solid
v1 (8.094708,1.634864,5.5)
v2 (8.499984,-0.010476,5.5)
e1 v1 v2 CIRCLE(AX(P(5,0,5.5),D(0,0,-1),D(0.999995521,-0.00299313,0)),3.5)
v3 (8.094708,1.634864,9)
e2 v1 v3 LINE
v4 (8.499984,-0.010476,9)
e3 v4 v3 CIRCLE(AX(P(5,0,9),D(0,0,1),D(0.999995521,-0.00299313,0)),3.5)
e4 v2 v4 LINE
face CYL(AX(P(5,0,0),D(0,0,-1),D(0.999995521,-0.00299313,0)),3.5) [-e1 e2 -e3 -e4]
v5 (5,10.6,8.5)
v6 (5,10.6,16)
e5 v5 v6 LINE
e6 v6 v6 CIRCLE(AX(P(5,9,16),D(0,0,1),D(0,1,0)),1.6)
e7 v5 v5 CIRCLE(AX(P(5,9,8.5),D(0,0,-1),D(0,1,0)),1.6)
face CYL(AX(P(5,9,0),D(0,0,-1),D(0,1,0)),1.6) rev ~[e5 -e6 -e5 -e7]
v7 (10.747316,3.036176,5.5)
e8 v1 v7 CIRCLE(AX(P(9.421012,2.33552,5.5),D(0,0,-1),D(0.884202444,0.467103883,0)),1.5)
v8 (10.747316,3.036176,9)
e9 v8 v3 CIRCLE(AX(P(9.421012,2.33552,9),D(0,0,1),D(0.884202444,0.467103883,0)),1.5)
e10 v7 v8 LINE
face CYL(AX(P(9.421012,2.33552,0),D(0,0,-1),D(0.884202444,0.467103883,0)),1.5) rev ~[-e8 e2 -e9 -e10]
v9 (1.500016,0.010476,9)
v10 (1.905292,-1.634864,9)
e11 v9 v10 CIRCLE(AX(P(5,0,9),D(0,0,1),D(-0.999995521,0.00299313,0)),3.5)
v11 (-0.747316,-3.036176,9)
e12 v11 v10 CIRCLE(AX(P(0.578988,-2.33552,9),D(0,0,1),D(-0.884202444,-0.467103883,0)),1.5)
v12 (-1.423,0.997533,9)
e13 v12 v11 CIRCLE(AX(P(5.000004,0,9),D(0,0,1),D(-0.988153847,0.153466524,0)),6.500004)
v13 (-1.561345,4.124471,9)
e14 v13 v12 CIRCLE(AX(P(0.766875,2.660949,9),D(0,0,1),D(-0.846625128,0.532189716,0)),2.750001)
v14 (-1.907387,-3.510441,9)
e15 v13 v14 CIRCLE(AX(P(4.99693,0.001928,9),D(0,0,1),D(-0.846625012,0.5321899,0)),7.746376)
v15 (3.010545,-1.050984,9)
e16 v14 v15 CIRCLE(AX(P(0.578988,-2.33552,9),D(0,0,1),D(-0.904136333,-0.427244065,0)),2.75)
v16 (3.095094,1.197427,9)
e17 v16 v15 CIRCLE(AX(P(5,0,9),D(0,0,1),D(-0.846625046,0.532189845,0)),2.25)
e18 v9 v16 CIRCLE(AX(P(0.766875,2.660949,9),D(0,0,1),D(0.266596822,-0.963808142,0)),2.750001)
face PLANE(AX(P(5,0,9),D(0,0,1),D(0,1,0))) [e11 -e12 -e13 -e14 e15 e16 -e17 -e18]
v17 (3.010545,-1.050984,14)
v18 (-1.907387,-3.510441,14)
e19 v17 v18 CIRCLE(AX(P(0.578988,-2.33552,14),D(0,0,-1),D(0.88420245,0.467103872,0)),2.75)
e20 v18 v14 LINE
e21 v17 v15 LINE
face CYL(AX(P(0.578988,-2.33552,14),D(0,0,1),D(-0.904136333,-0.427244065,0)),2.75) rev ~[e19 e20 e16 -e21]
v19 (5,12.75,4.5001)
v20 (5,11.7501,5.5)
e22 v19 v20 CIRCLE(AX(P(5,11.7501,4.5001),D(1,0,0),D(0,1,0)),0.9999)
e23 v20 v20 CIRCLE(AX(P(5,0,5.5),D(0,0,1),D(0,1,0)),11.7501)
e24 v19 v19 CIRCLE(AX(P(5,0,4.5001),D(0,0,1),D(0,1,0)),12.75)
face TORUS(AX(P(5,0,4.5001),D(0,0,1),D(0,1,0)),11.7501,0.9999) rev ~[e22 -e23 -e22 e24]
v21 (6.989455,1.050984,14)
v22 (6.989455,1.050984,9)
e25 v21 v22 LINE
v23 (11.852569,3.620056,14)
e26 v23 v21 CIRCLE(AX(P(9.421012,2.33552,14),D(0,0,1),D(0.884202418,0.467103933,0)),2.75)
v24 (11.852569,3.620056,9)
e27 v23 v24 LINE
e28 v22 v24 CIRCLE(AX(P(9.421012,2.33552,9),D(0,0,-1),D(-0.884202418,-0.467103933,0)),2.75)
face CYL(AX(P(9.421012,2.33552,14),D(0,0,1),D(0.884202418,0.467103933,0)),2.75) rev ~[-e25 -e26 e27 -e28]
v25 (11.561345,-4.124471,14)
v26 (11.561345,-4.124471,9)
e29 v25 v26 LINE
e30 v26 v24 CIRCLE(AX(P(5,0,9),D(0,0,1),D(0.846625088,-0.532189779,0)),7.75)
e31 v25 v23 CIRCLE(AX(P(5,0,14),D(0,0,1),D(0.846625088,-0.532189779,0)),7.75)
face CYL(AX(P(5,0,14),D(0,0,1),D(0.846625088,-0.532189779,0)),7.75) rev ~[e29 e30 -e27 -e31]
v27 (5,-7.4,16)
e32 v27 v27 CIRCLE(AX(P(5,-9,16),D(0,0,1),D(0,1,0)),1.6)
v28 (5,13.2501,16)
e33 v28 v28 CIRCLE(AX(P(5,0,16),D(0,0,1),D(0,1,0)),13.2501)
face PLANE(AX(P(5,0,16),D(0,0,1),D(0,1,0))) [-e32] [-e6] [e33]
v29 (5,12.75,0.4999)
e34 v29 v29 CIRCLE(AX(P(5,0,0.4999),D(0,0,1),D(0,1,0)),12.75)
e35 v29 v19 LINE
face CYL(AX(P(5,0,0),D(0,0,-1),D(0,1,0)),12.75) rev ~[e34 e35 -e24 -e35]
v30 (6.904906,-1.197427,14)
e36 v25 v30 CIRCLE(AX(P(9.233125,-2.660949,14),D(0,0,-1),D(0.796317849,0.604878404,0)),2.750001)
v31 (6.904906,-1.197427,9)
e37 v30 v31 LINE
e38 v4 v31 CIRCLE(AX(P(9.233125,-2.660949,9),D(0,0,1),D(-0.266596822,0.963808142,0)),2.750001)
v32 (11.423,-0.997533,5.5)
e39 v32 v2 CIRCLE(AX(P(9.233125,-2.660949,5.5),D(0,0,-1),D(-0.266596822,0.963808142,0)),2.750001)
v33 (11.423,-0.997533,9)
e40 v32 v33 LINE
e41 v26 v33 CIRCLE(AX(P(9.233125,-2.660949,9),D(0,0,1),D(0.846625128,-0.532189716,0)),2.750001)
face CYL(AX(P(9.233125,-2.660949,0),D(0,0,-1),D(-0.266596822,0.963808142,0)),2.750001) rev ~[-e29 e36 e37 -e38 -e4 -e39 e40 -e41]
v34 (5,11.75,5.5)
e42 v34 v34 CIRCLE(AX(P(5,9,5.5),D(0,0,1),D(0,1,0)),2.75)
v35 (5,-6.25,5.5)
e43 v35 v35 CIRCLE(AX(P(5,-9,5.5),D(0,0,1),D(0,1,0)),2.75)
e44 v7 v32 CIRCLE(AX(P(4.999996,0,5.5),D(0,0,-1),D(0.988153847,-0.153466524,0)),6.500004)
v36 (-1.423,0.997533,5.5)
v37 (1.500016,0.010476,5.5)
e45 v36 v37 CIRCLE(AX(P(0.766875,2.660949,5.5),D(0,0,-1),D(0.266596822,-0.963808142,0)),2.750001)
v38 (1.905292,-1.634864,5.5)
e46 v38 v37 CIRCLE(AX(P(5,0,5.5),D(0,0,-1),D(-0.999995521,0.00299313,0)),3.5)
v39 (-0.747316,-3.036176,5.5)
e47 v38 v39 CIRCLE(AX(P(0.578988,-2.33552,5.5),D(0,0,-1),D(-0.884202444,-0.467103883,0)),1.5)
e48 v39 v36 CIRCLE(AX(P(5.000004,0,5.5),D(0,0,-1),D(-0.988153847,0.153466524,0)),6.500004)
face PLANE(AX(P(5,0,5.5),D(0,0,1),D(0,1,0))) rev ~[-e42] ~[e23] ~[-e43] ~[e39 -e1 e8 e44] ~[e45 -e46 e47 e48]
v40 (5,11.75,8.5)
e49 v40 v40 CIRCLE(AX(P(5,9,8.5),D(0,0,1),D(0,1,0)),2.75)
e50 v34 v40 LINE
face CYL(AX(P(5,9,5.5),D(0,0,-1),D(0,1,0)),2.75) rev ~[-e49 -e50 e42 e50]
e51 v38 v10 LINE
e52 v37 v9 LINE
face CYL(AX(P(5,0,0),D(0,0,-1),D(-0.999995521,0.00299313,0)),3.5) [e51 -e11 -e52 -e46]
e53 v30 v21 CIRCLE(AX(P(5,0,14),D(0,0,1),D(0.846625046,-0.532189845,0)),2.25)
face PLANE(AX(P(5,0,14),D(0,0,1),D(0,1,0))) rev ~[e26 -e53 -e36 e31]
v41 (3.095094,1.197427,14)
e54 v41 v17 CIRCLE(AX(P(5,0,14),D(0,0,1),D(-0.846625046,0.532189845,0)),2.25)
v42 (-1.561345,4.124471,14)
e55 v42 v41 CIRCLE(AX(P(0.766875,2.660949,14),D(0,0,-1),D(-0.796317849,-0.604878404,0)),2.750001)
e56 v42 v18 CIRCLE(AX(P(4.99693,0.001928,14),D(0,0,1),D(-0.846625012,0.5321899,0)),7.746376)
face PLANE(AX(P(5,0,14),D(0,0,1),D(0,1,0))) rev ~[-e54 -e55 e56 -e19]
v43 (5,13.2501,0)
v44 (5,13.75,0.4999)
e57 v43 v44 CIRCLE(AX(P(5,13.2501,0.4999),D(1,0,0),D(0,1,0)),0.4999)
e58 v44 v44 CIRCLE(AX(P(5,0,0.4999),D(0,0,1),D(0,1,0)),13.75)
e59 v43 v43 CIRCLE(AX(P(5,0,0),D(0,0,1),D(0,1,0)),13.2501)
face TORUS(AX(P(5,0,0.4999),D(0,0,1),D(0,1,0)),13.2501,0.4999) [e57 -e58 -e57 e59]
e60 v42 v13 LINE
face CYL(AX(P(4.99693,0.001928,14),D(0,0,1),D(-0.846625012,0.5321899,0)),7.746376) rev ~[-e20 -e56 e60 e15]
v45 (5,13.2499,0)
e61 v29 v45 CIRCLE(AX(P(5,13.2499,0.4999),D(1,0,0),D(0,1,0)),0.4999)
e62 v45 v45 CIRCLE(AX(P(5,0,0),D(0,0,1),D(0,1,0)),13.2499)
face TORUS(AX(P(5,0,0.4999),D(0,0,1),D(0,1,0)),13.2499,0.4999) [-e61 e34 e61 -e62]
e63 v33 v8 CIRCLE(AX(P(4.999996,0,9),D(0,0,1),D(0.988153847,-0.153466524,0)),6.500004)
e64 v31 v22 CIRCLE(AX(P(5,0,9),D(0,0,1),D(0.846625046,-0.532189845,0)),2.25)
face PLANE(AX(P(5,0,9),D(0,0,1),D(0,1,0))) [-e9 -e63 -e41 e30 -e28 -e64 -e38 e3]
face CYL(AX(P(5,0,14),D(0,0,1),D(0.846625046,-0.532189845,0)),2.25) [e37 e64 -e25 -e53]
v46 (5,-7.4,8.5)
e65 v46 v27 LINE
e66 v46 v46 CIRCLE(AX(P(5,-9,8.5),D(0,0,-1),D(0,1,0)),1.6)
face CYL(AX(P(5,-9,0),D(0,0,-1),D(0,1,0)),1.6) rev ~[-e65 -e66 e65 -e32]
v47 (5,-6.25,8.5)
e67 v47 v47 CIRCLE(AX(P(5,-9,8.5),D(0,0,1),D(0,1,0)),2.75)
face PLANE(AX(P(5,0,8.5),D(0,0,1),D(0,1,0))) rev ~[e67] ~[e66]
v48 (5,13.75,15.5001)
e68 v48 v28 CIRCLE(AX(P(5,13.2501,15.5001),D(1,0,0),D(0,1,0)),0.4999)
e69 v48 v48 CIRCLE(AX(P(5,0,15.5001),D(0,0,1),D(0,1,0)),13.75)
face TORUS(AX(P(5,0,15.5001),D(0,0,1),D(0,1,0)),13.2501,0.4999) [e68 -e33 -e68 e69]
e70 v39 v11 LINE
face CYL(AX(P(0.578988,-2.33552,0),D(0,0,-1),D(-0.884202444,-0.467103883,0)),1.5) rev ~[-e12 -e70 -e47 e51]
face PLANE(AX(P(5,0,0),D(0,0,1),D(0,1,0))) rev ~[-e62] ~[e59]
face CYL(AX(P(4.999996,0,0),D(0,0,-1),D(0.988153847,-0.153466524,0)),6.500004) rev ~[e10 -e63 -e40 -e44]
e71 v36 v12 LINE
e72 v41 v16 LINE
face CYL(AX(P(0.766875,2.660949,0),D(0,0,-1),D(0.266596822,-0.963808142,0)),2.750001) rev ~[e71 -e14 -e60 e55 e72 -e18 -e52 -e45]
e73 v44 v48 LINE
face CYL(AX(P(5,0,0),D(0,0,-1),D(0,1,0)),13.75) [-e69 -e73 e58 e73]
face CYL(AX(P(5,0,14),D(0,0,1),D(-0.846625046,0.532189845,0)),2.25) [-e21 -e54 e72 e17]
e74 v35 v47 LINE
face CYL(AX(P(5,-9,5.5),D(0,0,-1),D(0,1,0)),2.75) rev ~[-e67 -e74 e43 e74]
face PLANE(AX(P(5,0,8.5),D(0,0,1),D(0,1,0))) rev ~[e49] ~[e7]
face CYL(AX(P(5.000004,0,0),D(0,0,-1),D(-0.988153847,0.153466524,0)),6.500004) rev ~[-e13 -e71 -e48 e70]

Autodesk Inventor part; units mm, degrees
ref_plane "YZ Plane" through (0, 0, 0) normal (1, 0, 0) x (0, 1, 0)
ref_plane "XZ Plane" through (0, 0, 0) normal (0, 1, 0) x (-1, 0, 0)
ref_plane "XY Plane" through (0, 0, 0) normal (0, 0, 1) x (1, 0, 0)
sketch "Skizze2" plane through (5, 0, 0) normal (0, 0, 1) x (0, 1, 0)
  line L0 (8.038058, 0) -> (-10.166505, 0) construction
  line L1 (0, 30.8) -> (0, -30.8) construction
  line L2 (-70, 0) -> (70, 0) construction
  arc A0 (3.036176, -5.747316) -> (1.634864, -3.094708) centre (2.33552, -4.421012) ccw
  arc A1 (-3.036176, 5.747316) -> (-1.634864, 3.094708) centre (-2.33552, 4.421012) ccw
  line L3 (-0.006109, 0) -> (9.613184, 0) construction
  line L4 (-0.006109, 0) -> (-9.625402, 0) construction
  circle A2 centre (0, 0) radius 5 construction
  line L5 (-2.33552, 4.421012) -> (2.33552, -4.421012) construction
  line L6 (-6.186265, -9.841316) -> (6.420655, 10.214191) construction
  arc A3 (-0.010476, -3.499984) -> (-0.997533, -6.423) centre (-2.660949, -4.233126) ccw
  arc A4 (0.010476, 3.499984) -> (0.997533, 6.423) centre (2.660949, 4.233126) ccw
  arc A5 (-10.500103, 0) -> (-10.500103, 0) centre (0, 0) ccw
  arc A6 (10.499894, 0) -> (10.499894, 0) centre (0, 0) ccw
  arc A7 (-7.500104, 0) -> (-7.500104, 0) centre (0, 0) ccw
  arc A8 (7.499894, 0) -> (7.499894, 0) centre (0, 0) ccw
  arc A9 (-0.010476, -3.499984) -> (1.634864, -3.094708) centre (0, 0) ccw
  arc A10 (-0.997533, -6.423) -> (3.036176, -5.747316) centre (0, 0) ccw
  arc A11 (0.010476, 3.499984) -> (-1.634864, 3.094708) centre (0, 0) ccw
  arc A12 (0.997533, 6.423) -> (-3.036176, 5.747316) centre (0, 0) ccw
  circle A13 centre (0, 0) radius 13.75
  circle A14 centre (0, 0) radius 12.75
  circle A15 centre (0, 0) radius 9 construction
  circle A16 centre (-9, 0) radius 1.6
  circle A17 centre (9, 0) radius 1.6
  arc A18 (-4.124471, -6.561345) -> (3.620056, -6.852569) centre (0, 0) ccw
  arc A19 (-3.510441, 6.907387) -> (-1.050984, 1.989455) centre (-2.33552, 4.421012) ccw
  arc A20 (3.620056, -6.852569) -> (1.050984, -1.989455) centre (2.33552, -4.421012) ccw
  arc A21 (-1.197427, -1.904906) -> (1.050984, -1.989455) centre (0, 0) ccw
  arc A22 (1.197427, 1.904906) -> (-1.050984, 1.989455) centre (0, 0) ccw
  arc A23 (4.124471, 6.561345) -> (-3.510441, 6.907387) centre (0.001927, 0.003066) ccw
  circle A24 centre (-9, 0) radius 2.75
  circle A25 centre (9, 0) radius 2.75
  dimension "d3" = 3
  dimension "d4" = 3
  dimension "d57" = 10
  dimension "d67" = 152.154
  dimension "d215" = 5.5
  dimension "d216" = 60
  dimension "d218" = 27.5
  dimension "d219" = 1
  dimension "d227" = 18
  dimension "d228" = 3.2
  dimension "d235" = 5.5
extrude "Extrusion15" add sketch "Skizze2" along normal blind 16 contours A10 A3 A7 A9 A0 | A0 A9 A3 A21 A20 A7 A10 | A7 A20 A18 A3 | A3 A7 | A3 A7 A24 A19 A22 A4 A25 A20 A21 | A18 A20 A7 A25 A5 A24 A3 | A24 A5 A16 A7 | A7 A16 A24 | A25 A7 A17 | A7 A17 A5 A25 | A24 A5 A16 | A25 A5 A17 A7 | A7 A4 A23 A19 A24 A5 A25 | A5 A17 A25 | A16 A5 A24 A7 | A7 A4 | A4 A11 A1 A12 A7 | A19 A23 A4 A7 | A7 A4 A12 A1 A11 A22 A19 | A13 | A14
extrude "Extrusion16" cut sketch "Skizze2" along normal blind 5.5 contours A10 A3 A7 A9 A0 | A0 A9 A3 A21 A20 A7 A10 | A7 A20 A18 A3 | A3 A7 | A3 A7 A24 A19 A22 A4 A25 A20 A21 | A18 A20 A7 A25 A5 A24 A3 | A24 A5 A16 A7 | A7 A16 A24 | A25 A7 A17 | A7 A17 A5 A25 | A16 A5 A7 | A7 A16 | A24 A5 A16 | A17 A7 | A7 A17 A5 | A25 A5 A17 A7 | A7 A4 A23 A19 A24 A5 A25 | A5 A17 A25 | A16 A5 A24 A7 | A16 A5 | A5 A17 | A7 A4 | A4 A11 A1 A12 A7 | A19 A23 A4 A7 | A7 A4 A12 A1 A11 A22 A19 | A14
extrude "Extrusion17" cut sketch "Skizze2" along normal blind 14 contours A10 A3 A7 A9 A0 | A3 A7 | A7 A4 | A4 A11 A1 A12 A7
extrude "Extrusion19" cut sketch "Skizze2" against normal blind 5 from surface at 14 contours A0 A9 A3 A21 A20 A7 A10 | A7 A20 A18 A3 | A19 A23 A4 A7 | A7 A4 A12 A1 A11 A22 A19
extrude "Extrusion20" cut sketch "Skizze2" along normal blind 3 from surface at 5.5 contours A24 A5 A16 A7 | A7 A16 A24 | A25 A7 A17 | A7 A17 A5 A25 | A24 A5 A16 | A25 A5 A17 A7 | A5 A17 A25 | A16 A5 A24 A7
fillet "Rundung8" radius 1 1 edges at (5, -12.75, 5.5)
fillet "Rundung9" radius 0.5 3 edges at (5, -13.75, 16) (5, -13.75, 0) (5, -12.75, 0)
equation "\"d4\" = d3"
equation "\"d91\" = 60deg"
equation "\"Skizze5_Pitch\" = 2"
equation "\"d111\" = 60deg"
equation "\"Skizze7_Pitch\" = 2"
equation "\"d129\" = 60deg"
equation "\"Skizze9_Pitch\" = 2"
equation "\"d147\" = 60deg"
equation "\"Skizze11_Pitch\" = 2.5"
equation "\"d165\" = 60deg"
equation "\"Skizze13_Pitch\" = 2"
properties part number "GU10-Socket" material "PC/ABS-Kunststoff"
